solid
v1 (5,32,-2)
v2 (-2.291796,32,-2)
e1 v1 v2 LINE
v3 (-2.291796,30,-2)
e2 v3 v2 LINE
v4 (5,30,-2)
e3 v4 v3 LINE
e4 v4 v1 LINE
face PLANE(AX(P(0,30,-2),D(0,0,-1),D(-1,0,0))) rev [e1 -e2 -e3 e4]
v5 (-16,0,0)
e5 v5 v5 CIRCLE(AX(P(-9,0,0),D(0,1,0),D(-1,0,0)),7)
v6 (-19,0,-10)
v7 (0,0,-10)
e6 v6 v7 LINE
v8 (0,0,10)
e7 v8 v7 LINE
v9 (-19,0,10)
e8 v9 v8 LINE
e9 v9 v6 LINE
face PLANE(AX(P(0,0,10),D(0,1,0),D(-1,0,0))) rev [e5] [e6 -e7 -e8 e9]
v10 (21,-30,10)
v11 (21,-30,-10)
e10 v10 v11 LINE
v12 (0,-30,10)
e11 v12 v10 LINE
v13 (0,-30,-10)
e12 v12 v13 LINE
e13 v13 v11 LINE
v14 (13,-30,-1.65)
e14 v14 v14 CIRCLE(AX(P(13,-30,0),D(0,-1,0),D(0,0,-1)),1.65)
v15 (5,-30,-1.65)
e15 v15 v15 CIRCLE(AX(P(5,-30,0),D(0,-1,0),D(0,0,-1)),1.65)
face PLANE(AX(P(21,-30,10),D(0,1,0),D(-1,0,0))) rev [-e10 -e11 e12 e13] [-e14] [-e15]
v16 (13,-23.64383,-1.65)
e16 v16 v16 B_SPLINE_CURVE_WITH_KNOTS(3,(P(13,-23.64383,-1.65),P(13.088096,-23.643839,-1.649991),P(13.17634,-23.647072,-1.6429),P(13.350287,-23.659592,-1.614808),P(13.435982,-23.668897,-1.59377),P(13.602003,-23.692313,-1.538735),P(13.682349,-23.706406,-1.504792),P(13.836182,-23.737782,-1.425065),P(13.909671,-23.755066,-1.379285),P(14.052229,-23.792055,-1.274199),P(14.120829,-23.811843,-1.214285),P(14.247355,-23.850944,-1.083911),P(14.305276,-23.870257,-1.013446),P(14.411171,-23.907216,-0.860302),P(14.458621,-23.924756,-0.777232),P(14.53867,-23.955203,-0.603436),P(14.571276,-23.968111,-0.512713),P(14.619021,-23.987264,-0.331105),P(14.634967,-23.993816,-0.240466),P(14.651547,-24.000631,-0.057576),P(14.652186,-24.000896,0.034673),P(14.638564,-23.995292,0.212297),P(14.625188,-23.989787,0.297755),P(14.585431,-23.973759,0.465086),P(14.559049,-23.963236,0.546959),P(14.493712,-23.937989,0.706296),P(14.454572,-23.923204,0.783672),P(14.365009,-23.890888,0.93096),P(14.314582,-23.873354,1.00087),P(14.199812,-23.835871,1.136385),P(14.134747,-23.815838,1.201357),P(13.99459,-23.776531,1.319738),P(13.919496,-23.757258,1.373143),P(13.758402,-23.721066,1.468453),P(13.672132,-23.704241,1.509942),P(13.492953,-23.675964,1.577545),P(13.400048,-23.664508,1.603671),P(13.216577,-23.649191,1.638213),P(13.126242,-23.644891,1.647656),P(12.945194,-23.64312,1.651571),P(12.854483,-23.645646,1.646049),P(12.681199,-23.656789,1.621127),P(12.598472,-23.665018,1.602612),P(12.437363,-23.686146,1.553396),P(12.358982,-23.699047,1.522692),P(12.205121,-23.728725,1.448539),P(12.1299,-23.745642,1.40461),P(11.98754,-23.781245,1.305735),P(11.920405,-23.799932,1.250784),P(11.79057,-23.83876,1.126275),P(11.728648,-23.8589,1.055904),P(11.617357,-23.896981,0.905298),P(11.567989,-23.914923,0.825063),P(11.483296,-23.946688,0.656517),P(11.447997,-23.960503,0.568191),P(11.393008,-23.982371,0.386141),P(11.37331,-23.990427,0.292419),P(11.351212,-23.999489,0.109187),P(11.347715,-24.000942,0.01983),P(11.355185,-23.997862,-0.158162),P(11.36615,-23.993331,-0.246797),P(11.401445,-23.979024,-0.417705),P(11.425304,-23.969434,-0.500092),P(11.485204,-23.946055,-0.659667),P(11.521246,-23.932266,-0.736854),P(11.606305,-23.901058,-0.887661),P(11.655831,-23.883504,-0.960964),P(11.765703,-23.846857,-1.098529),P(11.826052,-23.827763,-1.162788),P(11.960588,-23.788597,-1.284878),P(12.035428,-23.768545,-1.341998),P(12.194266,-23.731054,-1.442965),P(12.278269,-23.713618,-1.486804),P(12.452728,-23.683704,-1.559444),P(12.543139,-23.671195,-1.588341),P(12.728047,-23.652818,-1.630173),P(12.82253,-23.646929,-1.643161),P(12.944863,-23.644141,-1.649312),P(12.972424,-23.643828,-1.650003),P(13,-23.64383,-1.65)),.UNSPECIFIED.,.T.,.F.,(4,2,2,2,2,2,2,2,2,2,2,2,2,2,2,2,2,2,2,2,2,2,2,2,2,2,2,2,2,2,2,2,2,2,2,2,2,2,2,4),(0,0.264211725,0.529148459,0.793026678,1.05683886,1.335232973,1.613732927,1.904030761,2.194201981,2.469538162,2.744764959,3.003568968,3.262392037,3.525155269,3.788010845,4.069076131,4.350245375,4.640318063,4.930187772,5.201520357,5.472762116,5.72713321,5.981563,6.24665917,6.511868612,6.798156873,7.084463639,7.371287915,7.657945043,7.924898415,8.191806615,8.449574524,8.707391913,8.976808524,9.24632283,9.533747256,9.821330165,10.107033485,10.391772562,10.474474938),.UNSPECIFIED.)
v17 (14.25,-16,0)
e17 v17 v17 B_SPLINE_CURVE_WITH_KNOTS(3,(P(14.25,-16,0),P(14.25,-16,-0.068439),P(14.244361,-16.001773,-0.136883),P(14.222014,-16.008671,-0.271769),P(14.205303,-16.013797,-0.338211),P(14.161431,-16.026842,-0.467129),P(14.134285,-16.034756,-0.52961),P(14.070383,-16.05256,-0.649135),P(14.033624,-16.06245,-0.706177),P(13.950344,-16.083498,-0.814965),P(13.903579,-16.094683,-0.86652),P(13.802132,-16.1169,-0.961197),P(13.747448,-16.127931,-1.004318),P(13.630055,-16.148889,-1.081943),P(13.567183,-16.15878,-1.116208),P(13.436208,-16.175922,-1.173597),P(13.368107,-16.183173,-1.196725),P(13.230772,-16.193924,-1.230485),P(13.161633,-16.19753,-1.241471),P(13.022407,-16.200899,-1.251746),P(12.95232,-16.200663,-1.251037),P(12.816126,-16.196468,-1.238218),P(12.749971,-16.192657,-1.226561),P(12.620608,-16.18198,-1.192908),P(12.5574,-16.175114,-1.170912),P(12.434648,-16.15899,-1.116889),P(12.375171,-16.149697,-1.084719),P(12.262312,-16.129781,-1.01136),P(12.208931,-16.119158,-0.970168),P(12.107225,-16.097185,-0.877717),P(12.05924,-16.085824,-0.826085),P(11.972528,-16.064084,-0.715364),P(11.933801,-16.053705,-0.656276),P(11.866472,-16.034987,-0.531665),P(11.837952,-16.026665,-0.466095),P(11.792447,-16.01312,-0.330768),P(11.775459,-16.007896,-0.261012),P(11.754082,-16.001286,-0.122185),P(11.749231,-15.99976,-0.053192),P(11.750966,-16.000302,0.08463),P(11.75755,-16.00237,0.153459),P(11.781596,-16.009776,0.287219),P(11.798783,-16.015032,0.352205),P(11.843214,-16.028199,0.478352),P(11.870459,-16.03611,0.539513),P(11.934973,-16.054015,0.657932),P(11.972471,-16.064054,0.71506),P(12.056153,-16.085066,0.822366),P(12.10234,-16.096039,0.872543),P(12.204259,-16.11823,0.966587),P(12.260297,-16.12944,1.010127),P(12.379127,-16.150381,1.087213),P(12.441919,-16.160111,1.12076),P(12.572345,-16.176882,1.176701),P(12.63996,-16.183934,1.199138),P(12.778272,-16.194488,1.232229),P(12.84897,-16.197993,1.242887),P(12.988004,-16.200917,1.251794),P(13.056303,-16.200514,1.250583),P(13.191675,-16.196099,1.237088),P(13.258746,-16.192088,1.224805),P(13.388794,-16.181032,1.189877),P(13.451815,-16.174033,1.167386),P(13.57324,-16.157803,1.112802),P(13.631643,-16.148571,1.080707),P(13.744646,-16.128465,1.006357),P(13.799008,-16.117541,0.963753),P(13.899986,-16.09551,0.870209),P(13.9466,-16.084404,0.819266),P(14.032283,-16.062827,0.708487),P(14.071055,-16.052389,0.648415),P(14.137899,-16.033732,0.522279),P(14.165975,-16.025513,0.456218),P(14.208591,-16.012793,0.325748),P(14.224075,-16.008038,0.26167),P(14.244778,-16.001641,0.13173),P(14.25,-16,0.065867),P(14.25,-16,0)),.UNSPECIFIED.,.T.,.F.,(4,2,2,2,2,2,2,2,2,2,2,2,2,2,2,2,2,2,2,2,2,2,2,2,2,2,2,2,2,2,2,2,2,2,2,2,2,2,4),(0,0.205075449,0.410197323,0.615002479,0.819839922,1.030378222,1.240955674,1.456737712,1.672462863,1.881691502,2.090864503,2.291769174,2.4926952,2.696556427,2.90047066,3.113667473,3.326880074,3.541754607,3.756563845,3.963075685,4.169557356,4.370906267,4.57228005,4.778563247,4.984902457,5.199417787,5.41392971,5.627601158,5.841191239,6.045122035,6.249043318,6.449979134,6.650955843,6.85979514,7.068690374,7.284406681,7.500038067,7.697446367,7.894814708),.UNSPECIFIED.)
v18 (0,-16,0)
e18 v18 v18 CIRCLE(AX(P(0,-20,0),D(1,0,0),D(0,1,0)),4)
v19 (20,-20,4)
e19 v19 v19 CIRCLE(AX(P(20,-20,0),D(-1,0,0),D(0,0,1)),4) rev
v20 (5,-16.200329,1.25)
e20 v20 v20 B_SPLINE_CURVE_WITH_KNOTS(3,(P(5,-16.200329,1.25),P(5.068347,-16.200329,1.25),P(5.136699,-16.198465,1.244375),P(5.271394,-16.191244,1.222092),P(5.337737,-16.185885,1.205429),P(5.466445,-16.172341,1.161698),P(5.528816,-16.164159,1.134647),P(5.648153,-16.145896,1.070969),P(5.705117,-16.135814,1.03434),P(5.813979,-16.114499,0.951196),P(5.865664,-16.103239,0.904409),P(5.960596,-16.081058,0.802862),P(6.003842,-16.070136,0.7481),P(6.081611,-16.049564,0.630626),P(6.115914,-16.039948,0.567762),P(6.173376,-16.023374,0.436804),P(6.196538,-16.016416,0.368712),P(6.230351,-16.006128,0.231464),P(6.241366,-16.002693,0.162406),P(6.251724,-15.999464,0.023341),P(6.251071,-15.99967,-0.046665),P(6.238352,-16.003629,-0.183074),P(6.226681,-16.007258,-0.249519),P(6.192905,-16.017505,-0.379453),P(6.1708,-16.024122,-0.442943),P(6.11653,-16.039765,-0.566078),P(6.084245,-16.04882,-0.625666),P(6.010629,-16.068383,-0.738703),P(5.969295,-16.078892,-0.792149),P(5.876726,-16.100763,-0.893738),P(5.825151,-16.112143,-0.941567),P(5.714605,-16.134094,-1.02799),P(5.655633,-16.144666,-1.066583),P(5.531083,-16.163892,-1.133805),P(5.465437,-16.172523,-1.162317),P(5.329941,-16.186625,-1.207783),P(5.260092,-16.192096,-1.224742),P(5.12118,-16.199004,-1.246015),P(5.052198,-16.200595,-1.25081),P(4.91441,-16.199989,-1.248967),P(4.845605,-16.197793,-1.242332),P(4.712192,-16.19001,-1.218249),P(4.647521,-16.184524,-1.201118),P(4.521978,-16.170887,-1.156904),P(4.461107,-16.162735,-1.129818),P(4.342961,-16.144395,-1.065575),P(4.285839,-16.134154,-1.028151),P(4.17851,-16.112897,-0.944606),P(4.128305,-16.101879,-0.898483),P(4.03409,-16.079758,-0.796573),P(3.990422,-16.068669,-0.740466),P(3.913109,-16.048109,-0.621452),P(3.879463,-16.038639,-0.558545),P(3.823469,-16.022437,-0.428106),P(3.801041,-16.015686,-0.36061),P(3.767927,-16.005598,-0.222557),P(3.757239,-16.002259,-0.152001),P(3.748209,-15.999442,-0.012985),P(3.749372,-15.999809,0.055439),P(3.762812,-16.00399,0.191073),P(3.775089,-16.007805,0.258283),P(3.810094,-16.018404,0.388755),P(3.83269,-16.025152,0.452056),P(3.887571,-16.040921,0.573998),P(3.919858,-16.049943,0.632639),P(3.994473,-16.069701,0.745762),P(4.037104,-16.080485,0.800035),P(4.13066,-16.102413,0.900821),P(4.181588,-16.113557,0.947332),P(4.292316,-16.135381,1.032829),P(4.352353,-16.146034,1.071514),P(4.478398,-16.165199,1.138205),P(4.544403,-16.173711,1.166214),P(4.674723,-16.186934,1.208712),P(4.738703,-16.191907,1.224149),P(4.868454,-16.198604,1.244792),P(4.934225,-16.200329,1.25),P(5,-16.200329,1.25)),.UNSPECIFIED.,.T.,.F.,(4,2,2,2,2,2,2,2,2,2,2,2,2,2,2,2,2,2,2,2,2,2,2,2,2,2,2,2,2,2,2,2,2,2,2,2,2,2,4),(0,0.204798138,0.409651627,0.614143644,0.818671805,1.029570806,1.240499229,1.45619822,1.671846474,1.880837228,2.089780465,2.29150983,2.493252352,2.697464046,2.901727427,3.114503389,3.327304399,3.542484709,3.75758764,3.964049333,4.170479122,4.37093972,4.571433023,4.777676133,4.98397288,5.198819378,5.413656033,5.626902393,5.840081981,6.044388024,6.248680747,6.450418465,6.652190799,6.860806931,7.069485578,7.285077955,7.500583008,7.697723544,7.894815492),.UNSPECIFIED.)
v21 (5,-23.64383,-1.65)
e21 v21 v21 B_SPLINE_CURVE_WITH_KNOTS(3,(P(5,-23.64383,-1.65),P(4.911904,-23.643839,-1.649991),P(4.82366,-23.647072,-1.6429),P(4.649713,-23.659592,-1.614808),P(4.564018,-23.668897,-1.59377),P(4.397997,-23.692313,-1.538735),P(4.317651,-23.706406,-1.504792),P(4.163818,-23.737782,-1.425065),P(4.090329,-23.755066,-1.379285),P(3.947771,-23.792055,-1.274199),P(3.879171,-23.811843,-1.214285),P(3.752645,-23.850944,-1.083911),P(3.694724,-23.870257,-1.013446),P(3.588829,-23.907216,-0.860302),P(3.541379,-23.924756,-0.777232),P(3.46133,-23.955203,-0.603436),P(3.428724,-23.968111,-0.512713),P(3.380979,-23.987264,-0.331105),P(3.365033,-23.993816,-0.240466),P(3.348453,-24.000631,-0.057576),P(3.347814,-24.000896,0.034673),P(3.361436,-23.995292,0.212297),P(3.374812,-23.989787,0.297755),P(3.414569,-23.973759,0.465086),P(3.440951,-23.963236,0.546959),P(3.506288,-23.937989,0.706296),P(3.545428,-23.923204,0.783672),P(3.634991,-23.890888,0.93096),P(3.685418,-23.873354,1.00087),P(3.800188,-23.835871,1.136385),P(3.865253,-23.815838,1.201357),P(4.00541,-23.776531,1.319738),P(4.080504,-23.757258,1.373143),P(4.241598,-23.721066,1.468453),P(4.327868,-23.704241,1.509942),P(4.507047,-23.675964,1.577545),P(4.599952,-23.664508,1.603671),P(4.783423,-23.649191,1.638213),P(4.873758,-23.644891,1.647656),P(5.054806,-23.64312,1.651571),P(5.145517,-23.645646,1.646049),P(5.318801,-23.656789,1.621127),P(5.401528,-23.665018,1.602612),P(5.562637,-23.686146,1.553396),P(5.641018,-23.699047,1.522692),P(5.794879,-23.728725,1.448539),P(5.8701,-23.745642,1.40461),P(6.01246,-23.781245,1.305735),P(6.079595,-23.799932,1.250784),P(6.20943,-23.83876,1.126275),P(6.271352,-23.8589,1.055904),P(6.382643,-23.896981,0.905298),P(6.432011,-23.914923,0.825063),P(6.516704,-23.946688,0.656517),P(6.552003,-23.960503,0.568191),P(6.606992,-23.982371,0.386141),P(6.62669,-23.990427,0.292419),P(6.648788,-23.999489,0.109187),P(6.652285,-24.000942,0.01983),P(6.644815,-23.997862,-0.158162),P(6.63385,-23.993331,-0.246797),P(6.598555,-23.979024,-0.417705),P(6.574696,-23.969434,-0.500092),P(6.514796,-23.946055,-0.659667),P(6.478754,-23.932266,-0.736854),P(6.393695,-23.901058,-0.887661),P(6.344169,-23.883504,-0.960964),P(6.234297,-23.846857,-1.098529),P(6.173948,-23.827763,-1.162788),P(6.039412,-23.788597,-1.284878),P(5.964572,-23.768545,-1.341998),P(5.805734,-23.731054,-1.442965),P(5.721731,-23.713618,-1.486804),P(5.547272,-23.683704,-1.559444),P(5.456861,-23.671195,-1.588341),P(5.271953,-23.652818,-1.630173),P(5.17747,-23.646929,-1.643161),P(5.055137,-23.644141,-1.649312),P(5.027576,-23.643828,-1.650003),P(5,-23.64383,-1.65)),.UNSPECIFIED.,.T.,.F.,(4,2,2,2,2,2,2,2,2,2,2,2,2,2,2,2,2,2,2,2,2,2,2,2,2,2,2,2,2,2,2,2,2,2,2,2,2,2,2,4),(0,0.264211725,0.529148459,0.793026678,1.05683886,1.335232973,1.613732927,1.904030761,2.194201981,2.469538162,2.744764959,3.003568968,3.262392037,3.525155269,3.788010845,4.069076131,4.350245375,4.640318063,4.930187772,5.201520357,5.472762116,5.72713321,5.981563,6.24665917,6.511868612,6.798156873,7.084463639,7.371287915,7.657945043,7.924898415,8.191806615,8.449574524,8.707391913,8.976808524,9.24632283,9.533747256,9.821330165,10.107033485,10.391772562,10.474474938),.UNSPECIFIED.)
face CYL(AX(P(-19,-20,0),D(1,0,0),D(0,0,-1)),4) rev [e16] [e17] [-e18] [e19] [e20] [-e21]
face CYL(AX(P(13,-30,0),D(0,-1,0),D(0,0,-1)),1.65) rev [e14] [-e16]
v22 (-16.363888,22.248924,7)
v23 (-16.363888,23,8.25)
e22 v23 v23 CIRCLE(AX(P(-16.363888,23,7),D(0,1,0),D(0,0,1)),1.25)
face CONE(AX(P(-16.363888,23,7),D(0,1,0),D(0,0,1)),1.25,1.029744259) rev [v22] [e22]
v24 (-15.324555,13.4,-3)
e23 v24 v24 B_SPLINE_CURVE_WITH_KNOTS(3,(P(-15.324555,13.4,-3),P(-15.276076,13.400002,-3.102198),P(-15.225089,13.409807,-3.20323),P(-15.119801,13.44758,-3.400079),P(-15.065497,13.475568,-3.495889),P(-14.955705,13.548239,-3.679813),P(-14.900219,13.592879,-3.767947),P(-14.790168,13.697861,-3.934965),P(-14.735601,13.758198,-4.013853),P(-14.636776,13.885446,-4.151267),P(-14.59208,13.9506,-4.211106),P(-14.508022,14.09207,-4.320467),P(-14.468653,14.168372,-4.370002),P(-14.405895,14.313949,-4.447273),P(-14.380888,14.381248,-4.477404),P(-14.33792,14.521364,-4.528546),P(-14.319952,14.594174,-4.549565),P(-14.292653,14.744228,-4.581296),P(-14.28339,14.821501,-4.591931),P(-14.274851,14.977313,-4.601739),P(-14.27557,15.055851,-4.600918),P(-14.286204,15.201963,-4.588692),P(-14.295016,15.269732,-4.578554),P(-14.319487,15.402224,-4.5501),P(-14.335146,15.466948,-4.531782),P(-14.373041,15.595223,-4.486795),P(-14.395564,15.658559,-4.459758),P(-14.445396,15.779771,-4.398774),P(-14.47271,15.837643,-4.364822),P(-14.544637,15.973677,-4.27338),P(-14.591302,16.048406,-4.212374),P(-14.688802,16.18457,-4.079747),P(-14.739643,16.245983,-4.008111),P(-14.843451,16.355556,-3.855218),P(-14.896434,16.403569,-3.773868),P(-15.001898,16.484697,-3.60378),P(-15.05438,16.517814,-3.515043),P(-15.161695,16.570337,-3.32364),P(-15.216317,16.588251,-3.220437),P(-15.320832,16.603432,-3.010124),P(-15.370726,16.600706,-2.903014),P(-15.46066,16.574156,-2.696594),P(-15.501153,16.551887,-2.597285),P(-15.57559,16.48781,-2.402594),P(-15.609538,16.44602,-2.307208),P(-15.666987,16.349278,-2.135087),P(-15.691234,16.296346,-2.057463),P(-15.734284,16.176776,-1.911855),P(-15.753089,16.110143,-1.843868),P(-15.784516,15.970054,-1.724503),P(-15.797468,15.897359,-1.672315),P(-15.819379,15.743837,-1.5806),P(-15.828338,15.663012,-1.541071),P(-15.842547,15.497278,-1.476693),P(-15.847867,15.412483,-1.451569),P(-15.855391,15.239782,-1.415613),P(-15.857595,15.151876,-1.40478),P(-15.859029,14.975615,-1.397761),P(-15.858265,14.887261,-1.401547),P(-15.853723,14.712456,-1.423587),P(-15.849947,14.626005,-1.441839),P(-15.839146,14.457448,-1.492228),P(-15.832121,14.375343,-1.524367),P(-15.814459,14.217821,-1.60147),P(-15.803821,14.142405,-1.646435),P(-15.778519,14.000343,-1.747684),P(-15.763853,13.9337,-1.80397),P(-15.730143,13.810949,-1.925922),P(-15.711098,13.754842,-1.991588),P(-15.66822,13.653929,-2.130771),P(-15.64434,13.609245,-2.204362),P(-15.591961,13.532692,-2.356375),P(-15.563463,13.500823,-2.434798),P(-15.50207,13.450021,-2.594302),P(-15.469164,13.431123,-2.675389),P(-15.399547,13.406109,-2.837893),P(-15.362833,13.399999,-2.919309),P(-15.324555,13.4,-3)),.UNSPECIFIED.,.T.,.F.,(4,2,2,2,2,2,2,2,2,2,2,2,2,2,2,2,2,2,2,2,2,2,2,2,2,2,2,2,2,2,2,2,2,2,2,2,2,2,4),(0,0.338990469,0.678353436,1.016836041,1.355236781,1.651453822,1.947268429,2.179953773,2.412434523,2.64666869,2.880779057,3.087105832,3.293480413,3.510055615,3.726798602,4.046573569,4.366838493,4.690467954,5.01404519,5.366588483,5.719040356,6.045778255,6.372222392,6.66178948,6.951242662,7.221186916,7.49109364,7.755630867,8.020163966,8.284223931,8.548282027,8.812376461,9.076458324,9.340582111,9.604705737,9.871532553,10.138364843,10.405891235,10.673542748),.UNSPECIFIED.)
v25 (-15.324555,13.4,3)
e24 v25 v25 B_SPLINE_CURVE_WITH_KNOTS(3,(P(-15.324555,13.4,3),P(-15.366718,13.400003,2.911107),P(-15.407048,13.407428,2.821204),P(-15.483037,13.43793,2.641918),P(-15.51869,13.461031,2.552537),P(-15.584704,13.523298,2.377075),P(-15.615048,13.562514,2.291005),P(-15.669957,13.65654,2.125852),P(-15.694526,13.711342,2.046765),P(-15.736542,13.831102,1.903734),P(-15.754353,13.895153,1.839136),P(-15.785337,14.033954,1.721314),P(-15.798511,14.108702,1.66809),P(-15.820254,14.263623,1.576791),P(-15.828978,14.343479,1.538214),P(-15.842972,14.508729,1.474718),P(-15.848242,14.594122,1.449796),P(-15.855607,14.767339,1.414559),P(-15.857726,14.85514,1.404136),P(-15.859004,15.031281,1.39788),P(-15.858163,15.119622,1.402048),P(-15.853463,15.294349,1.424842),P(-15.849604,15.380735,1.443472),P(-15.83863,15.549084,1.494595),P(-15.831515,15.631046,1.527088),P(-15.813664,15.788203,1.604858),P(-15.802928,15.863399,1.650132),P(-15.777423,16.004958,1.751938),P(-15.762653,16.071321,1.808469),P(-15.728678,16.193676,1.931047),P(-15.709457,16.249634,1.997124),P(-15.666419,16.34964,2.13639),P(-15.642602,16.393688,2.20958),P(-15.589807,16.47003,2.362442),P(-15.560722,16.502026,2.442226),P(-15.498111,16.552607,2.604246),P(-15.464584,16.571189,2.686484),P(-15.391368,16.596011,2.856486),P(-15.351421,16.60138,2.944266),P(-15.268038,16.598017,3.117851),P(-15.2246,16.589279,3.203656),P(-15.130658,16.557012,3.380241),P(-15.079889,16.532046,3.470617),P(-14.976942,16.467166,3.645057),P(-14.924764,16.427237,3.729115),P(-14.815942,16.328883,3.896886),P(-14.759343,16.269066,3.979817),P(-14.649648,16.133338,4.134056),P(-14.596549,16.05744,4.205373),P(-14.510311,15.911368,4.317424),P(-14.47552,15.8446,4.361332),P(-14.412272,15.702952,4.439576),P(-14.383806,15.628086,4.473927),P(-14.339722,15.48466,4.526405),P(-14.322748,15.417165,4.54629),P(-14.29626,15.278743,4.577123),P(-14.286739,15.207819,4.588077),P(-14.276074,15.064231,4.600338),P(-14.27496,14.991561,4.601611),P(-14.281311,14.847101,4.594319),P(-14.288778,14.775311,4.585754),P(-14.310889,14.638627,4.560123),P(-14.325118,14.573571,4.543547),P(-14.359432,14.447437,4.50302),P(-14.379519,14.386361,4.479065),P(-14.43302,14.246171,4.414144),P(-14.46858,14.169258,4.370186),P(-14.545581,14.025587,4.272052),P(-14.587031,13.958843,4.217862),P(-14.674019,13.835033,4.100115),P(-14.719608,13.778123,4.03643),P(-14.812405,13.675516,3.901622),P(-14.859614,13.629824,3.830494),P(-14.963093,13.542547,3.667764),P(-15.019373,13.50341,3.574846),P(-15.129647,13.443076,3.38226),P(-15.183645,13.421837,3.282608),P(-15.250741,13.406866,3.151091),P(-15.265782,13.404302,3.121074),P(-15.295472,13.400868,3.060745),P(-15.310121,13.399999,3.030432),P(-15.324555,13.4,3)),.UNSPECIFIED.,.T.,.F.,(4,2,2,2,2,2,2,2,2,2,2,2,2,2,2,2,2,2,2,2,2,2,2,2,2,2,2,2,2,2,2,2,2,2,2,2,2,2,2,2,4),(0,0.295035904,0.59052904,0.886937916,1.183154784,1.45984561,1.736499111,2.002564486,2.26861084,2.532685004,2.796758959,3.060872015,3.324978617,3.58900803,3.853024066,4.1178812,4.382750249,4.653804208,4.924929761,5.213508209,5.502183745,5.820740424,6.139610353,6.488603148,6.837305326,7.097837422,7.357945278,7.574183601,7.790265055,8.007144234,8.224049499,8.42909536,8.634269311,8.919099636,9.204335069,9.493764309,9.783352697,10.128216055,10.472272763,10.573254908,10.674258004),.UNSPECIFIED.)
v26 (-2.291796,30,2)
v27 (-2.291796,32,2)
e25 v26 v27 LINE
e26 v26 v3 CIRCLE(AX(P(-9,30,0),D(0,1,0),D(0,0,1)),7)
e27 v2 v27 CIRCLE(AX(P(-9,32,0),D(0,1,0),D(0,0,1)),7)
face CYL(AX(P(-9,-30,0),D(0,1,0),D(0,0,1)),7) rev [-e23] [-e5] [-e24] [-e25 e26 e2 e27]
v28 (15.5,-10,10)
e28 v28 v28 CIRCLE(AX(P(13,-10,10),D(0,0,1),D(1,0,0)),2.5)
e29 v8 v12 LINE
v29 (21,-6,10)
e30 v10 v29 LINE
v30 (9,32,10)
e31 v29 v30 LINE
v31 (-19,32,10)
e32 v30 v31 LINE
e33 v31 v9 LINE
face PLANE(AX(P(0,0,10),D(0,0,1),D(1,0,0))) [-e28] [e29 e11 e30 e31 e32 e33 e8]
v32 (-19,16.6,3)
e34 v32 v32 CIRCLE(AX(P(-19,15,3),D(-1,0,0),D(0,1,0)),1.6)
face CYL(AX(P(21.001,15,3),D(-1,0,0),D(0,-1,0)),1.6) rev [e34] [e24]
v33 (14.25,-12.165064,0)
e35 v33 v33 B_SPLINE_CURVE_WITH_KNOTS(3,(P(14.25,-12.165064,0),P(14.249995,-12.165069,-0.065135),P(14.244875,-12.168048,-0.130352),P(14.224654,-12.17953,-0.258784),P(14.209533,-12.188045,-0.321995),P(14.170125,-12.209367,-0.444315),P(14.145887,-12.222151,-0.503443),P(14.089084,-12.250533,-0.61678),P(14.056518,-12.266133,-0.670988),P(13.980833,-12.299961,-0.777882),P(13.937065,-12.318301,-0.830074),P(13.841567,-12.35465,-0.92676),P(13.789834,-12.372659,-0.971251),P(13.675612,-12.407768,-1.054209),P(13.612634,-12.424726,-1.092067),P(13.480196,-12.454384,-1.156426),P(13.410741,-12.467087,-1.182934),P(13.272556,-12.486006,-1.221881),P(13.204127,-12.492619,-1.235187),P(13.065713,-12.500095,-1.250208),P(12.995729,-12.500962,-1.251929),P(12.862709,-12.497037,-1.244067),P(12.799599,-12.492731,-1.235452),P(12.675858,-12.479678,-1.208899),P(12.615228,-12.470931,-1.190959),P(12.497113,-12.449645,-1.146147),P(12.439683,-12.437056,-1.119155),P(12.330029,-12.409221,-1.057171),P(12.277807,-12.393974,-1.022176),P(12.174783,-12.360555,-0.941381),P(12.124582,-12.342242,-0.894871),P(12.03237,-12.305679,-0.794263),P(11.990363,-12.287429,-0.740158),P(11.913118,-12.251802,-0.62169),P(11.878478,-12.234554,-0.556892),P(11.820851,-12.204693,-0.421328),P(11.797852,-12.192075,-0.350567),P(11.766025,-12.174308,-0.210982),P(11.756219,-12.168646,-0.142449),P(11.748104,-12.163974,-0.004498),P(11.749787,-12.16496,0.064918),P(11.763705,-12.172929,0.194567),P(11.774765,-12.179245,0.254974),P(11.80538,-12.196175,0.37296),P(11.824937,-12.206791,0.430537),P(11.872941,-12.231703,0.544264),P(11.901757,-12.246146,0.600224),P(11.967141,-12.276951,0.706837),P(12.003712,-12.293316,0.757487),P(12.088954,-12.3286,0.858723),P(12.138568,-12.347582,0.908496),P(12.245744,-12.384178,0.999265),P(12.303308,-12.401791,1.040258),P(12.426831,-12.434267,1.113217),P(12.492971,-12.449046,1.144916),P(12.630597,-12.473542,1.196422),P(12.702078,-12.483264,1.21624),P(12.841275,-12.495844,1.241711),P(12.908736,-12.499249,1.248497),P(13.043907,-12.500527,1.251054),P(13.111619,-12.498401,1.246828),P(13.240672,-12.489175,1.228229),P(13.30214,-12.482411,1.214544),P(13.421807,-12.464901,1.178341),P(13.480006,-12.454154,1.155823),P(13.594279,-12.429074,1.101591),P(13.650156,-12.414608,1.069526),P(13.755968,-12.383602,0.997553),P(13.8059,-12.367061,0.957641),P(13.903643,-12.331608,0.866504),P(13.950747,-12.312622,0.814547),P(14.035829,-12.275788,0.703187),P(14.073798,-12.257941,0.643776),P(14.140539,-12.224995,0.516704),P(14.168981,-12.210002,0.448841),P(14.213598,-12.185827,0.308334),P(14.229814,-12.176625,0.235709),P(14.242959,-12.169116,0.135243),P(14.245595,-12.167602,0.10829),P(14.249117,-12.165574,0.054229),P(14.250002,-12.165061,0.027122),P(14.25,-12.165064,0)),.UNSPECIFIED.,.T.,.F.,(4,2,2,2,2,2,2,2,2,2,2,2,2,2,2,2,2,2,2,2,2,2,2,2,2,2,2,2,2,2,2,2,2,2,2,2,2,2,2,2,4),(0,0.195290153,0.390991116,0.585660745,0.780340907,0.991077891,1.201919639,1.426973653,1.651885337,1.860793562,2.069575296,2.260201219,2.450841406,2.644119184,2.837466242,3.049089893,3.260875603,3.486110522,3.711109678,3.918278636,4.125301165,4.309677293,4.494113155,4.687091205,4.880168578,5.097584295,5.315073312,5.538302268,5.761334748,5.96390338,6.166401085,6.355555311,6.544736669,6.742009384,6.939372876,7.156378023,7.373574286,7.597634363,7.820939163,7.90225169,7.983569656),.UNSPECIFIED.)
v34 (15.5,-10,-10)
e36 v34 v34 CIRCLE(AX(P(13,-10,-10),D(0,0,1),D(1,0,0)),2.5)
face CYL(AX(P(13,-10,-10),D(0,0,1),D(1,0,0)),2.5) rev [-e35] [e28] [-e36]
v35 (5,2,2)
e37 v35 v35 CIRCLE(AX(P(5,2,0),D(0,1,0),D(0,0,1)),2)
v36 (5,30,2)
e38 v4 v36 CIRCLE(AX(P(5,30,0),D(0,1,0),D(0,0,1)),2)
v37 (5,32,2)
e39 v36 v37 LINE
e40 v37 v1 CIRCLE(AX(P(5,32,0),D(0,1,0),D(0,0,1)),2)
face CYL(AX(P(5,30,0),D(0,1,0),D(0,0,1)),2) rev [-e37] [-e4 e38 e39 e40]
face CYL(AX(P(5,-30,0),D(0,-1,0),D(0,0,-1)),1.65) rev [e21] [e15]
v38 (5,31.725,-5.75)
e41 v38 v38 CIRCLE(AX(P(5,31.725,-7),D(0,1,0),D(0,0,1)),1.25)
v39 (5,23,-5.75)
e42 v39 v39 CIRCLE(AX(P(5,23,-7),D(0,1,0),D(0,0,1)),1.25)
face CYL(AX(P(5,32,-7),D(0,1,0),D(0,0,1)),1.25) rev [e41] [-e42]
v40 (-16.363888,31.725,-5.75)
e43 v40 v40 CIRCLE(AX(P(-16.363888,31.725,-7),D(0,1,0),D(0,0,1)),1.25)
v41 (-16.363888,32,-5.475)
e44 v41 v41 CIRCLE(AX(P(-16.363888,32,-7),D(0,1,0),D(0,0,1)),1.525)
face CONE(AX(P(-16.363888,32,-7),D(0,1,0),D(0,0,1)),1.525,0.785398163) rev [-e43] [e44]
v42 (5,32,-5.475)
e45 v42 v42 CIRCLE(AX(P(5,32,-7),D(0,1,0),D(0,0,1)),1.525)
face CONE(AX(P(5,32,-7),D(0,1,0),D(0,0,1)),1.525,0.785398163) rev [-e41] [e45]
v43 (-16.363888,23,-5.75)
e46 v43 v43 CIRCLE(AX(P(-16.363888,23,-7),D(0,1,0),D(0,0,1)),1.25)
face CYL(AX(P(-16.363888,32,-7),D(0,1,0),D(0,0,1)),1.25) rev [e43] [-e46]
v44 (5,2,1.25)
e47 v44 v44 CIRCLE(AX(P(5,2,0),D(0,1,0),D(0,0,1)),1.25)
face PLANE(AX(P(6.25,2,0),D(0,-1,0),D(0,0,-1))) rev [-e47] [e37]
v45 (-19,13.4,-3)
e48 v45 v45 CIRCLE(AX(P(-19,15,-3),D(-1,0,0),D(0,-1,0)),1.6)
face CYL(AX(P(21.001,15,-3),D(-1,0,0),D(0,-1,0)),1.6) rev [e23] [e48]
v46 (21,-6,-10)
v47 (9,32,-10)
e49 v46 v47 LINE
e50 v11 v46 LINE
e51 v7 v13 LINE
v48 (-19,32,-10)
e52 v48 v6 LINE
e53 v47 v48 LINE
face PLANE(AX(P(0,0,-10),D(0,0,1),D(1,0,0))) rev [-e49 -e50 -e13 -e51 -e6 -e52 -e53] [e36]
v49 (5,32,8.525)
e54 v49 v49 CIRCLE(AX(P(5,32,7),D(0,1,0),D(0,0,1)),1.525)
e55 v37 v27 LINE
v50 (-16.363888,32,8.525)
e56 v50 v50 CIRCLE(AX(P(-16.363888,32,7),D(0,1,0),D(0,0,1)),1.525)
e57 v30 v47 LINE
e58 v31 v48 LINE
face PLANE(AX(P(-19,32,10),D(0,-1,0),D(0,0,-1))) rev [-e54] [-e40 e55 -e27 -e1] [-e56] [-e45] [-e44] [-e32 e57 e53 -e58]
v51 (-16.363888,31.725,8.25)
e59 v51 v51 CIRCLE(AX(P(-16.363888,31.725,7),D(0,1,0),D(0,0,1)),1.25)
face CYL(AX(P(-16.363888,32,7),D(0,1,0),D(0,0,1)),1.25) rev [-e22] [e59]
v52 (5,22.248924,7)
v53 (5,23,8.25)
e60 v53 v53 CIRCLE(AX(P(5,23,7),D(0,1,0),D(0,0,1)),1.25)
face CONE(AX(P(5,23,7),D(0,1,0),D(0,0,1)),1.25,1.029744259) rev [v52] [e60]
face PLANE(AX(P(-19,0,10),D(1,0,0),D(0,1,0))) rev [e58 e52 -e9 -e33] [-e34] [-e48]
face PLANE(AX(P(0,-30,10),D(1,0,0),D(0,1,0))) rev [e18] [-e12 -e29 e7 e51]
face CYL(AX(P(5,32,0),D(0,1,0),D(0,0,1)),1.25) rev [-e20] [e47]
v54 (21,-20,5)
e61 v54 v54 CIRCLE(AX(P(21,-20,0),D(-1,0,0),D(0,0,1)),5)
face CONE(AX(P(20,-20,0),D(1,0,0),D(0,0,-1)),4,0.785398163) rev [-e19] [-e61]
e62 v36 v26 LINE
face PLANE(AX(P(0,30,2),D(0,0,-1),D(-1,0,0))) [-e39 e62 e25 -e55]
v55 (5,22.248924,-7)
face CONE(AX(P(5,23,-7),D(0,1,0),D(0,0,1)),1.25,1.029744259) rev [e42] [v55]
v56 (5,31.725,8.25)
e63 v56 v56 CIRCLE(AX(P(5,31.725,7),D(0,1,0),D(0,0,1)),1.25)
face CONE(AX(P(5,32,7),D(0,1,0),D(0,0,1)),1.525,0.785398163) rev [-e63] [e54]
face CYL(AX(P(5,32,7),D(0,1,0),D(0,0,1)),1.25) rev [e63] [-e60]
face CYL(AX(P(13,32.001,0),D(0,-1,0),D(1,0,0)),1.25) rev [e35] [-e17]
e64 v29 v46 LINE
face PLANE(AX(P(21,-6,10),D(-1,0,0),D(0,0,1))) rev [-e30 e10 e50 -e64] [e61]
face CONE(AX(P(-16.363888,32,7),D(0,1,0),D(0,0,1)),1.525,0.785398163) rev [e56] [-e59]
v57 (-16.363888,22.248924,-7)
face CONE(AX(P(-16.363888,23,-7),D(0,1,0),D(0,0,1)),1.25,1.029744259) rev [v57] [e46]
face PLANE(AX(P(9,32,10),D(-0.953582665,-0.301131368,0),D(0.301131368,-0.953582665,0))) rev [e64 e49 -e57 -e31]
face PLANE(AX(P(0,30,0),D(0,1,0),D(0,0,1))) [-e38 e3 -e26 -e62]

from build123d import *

# Parameters (mm, degrees)
BOSS_EXTRUDE1_DEPTH         = 10
CUT_EXTRUDE1_DEPTH          = 67.21933252457322
CUT_EXTRUDE2_DEPTH          = 2
M3_TAPPED_HOLE1_D           = 2.5
M3_TAPPED_HOLE1_DEPTH       = 9
M3_TAPPED_HOLE1_CSINK_D     = 3.05
M3_TAPPED_HOLE1_CSINK_ANGLE = 90
M3_TAPPED_HOLE1_TIP         = 0.7510757737844503
SKETCH5_R                   = 2.4999999999999987
CUT_EXTRUDE3_DEPTH          = 44.18564576337837
SKETCH6_R                   = 4
CUT_EXTRUDE4_DEPTH          = 53.191953402799555
CHAMFER1_SIZE               = 1
HOLE1_START                 = 2
HOLE1_OUTLINE_R             = 2
HOLE1_DEPTH                 = 28
HOLE1_START_2               = -16.200329062
HOLE1_2_OUTLINE_R           = 1.25
HOLE1_2_DEPTH               = 18.200329062
CUT_EXTRUDE5_REACH          = 54.192
CUT_EXTRUDE5_END_RADIUS     = 7
SKETCH9_R                   = 1.6000000000000005
M4_TAPPED_HOLE1_REACH       = 68.219
M4_TAPPED_HOLE1_BORE_R      = 1.65
CUT_EXTRUDE6_REACH          = 68.219
CUT_EXTRUDE6_END_RADIUS     = 2.4999999999999987
SKETCH12_R                  = 1.2499999999999991


# Read off the part's stored shape, not the designer's step: Hole1
with BuildPart() as part:
    # Sketch1 → Boss-Extrude1 (new, symmetric)
    with BuildSketch(Plane.XY):
        Polygon((0, 0), (-19.000000000000004, -3.04e-15), (-19, 32), (8.999999999999991, 32), (21, -5.9999999999999964), (21, -29.999999999999996), (3.47e-15, -30), align=None)
    extrude(amount=BOSS_EXTRUDE1_DEPTH, both=True)

    # Sketch2 → Cut-Extrude1 (cut, through all)
    with BuildSketch(Plane(origin=(0, 32, 0), x_dir=(1, 0, 0), z_dir=(0, 1, 0))):
        with BuildLine():
            ThreePointArc((-2.2917960675006315, 2.000000000000001), (-10.010587075047079, 6.926666858146693), (-16, -2.25e-15))
            Line((-16, 0), (-2, 0))
            ThreePointArc((-2, 0), (-2.0733331418533067, 1.0105870750470785), (-2.2917960675006315, 2.000000000000001))
        make_face()
        with BuildLine():
            Line((-2, 0), (-16, 0))
            ThreePointArc((-16, 8.6e-16), (-10.01058707504708, -6.926666858146693), (-2.2917960675006324, -2.0000000000000036))
            ThreePointArc((-2.2917960675006324, -2.0000000000000036), (-2.0733331418533067, -1.0105870750470807), (-2, -1.71e-15))
        make_face()
    extrude(amount=-CUT_EXTRUDE1_DEPTH, mode=Mode.SUBTRACT)

    # Sketch2<3> → Cut-Extrude2 (cut)
    with BuildSketch(Plane(origin=(0, 32, 0), x_dir=(1, 0, 0), z_dir=(0, 1, 0))):
        with BuildLine():
            ThreePointArc((5.000000000000001, 2.0000000000000004), (3.585786437626906, 1.4142135623730954), (3.0000000000000004, 2.4e-16))
            Line((3, 0), (7, 0))
            ThreePointArc((7.000000000000002, 0), (6.414213562373096, 1.4142135623730951), (5.000000000000001, 2.0000000000000004))
        make_face()
        with BuildLine():
            Line((7, 0), (3, 0))
            ThreePointArc((3.0000000000000004, 2.4e-16), (3.585786437626905, -1.4142135623730951), (5.000000000000001, -2.0000000000000004))
            ThreePointArc((5.000000000000001, -2.0000000000000004), (6.414213562373096, -1.4142135623730956), (7.000000000000002, -4.9e-16))
        make_face()
        with BuildLine():
            Line((3, 0), (-2, 0))
            ThreePointArc((-2, -1.71e-15), (-2.0733331418533067, -1.0105870750470807), (-2.2917960675006324, -2.0000000000000036))
            Line((-2.2917960675006315, -2.0000000000000013), (5.000000000000001, -2.0000000000000004))
            ThreePointArc((5.000000000000001, -2.0000000000000004), (3.585786437626905, -1.4142135623730951), (3.0000000000000004, 2.4e-16))
        make_face()
        with BuildLine():
            ThreePointArc((-2.2917960675006315, 2.000000000000001), (-2.0733331418533067, 1.0105870750470785), (-2, 0))
            Line((-2, 0), (3, 0))
            ThreePointArc((3.0000000000000004, 2.4e-16), (3.585786437626906, 1.4142135623730954), (5.000000000000001, 2.0000000000000004))
            Line((5.000000000000001, 2.0000000000000004), (-2.2917960675006315, 2.0000000000000013))
        make_face()
    extrude(amount=-CUT_EXTRUDE2_DEPTH, mode=Mode.SUBTRACT)

    # M3 Tapped Hole1
    with Locations(Plane(origin=(0, 32, 0), x_dir=(1, 0, 0), z_dir=(0, 1, 0))):
        with Locations((-16.363887926, 7), (-16.363887926, -7), (5, -7), (5, 7)):
            CounterSinkHole(M3_TAPPED_HOLE1_D / 2, M3_TAPPED_HOLE1_CSINK_D / 2, depth=M3_TAPPED_HOLE1_DEPTH, counter_sink_angle=M3_TAPPED_HOLE1_CSINK_ANGLE)
            with Locations((0, 0, -(M3_TAPPED_HOLE1_DEPTH + M3_TAPPED_HOLE1_TIP / 2))):  # 118° drill point
                Cone(0, M3_TAPPED_HOLE1_D / 2, M3_TAPPED_HOLE1_TIP, mode=Mode.SUBTRACT)

    # Sketch5 → Cut-Extrude3 (cut, through all)
    with BuildSketch(Plane.XY.offset(10)):
        with Locations((13.000000000000002, -9.999999999999998)):
            Circle(SKETCH5_R)
    extrude(amount=-CUT_EXTRUDE3_DEPTH, mode=Mode.SUBTRACT)

    # Sketch6 → Cut-Extrude4 (cut, through all)
    with BuildSketch(Plane(origin=(21, 0, 0), x_dir=(0, 0, -1), z_dir=(1, 0, 0))):
        with Locations((0, -19.999999999999996)):
            Circle(SKETCH6_R)
    extrude(amount=-CUT_EXTRUDE4_DEPTH, mode=Mode.SUBTRACT)

    # Chamfer1
    chamfer1_edges = [part.edges().sort_by_distance(p)[0] for p in [
        (21, -19.999999999999996, 4),
    ]]
    chamfer(chamfer1_edges, length=CHAMFER1_SIZE)

    # Hole1 outline → Hole1 (cut)
    with BuildSketch(Plane(origin=(0, 0, 0), x_dir=(1, 0, 0), z_dir=(0, 1, 0)).offset(HOLE1_START)):
        with Locations((5, 0)):
            Circle(HOLE1_OUTLINE_R)
    extrude(amount=HOLE1_DEPTH, mode=Mode.SUBTRACT)

    # Hole1 2 outline → Hole1 2 (cut)
    with BuildSketch(Plane(origin=(0, 0, 0), x_dir=(1, 0, 0), z_dir=(0, 1, 0)).offset(HOLE1_START_2)):
        with Locations((5, 0)):
            Circle(HOLE1_2_OUTLINE_R)
    extrude(amount=HOLE1_2_DEPTH, mode=Mode.SUBTRACT)

    # Cut-Extrude5: up to this cylinder (the profile starts outside it)
    cut_extrude5_end = Plane(origin=(-9, 15, 0), z_dir=(0, 1, 0)) * Cylinder(CUT_EXTRUDE5_END_RADIUS, 123.384, mode=Mode.PRIVATE)
    # Sketch9 → Cut-Extrude5 (cut, up to the surface)
    with BuildSketch(Plane.ZY.offset(19.000000000000004), mode=Mode.PRIVATE) as cut_extrude5_sk1:
        with Locations(Location((-2.999999999999998, 15, 0), (0, 0, 270))):
            Circle(SKETCH9_R)
    cut_extrude5_tool1 = extrude(cut_extrude5_sk1.sketch, amount=-CUT_EXTRUDE5_REACH, mode=Mode.PRIVATE) - cut_extrude5_end
    add(cut_extrude5_tool1.solids().sort_by_distance((-19, 15, -3))[0], mode=Mode.SUBTRACT)
    # Sketch9 → Cut-Extrude5 (cut, up to the surface)
    with BuildSketch(Plane.ZY.offset(19.000000000000004), mode=Mode.PRIVATE) as cut_extrude5_sk2:
        with Locations(Location((3.000000000000002, 15, 0), (0, 0, 270))):
            Circle(SKETCH9_R)
    cut_extrude5_tool2 = extrude(cut_extrude5_sk2.sketch, amount=-CUT_EXTRUDE5_REACH, mode=Mode.PRIVATE) - cut_extrude5_end
    add(cut_extrude5_tool2.solids().sort_by_distance((-19, 15, 3))[0], mode=Mode.SUBTRACT)

    # M4 Tapped Hole1 bore → M4 Tapped Hole1 (cut, up to next)
    with BuildSketch(Plane(origin=(4.96e-15, -30, 0), x_dir=(-1, -1.7e-16, 0), z_dir=(1.7e-16, -1, 0)), mode=Mode.PRIVATE) as m4_tapped_hole1_sk1:
        with Locations((-13, 0)):
            Circle(M4_TAPPED_HOLE1_BORE_R)
    m4_tapped_hole1_tool1 = extrude(m4_tapped_hole1_sk1.sketch, amount=-M4_TAPPED_HOLE1_REACH, mode=Mode.PRIVATE) & part.part
    # M4 Tapped Hole1 bore → M4 Tapped Hole1 (cut, up to next)
    with BuildSketch(Plane(origin=(4.96e-15, -30, 0), x_dir=(-1, -1.7e-16, 0), z_dir=(1.7e-16, -1, 0)), mode=Mode.PRIVATE) as m4_tapped_hole1_sk2:
        with Locations((-5, 0)):
            Circle(M4_TAPPED_HOLE1_BORE_R)
    m4_tapped_hole1_tool2 = extrude(m4_tapped_hole1_sk2.sketch, amount=-M4_TAPPED_HOLE1_REACH, mode=Mode.PRIVATE) & part.part
    add(m4_tapped_hole1_tool1.solids().sort_by_distance((13, -30, 0))[0], mode=Mode.SUBTRACT)
    add(m4_tapped_hole1_tool2.solids().sort_by_distance((5, -30, 0))[0], mode=Mode.SUBTRACT)

    # Cut-Extrude6: up to this cylinder (the profile starts outside it)
    cut_extrude6_end = Plane(origin=(13.000000000000002, -9.999999999999998, 0), z_dir=(0, 0, 1)) * Cylinder(CUT_EXTRUDE6_END_RADIUS, 142.438, mode=Mode.PRIVATE)
    # Sketch12 → Cut-Extrude6 (cut, up to the surface)
    with BuildSketch(Plane.XZ.offset(30), mode=Mode.PRIVATE) as cut_extrude6_sk1:
        with Locations((12.999999999999998, 0)):
            Circle(SKETCH12_R)
    cut_extrude6_tool1 = extrude(cut_extrude6_sk1.sketch, amount=-CUT_EXTRUDE6_REACH, mode=Mode.PRIVATE) - cut_extrude6_end
    add(cut_extrude6_tool1.solids().sort_by_distance((13, -30, 0))[0], mode=Mode.SUBTRACT)


solid = part.part
